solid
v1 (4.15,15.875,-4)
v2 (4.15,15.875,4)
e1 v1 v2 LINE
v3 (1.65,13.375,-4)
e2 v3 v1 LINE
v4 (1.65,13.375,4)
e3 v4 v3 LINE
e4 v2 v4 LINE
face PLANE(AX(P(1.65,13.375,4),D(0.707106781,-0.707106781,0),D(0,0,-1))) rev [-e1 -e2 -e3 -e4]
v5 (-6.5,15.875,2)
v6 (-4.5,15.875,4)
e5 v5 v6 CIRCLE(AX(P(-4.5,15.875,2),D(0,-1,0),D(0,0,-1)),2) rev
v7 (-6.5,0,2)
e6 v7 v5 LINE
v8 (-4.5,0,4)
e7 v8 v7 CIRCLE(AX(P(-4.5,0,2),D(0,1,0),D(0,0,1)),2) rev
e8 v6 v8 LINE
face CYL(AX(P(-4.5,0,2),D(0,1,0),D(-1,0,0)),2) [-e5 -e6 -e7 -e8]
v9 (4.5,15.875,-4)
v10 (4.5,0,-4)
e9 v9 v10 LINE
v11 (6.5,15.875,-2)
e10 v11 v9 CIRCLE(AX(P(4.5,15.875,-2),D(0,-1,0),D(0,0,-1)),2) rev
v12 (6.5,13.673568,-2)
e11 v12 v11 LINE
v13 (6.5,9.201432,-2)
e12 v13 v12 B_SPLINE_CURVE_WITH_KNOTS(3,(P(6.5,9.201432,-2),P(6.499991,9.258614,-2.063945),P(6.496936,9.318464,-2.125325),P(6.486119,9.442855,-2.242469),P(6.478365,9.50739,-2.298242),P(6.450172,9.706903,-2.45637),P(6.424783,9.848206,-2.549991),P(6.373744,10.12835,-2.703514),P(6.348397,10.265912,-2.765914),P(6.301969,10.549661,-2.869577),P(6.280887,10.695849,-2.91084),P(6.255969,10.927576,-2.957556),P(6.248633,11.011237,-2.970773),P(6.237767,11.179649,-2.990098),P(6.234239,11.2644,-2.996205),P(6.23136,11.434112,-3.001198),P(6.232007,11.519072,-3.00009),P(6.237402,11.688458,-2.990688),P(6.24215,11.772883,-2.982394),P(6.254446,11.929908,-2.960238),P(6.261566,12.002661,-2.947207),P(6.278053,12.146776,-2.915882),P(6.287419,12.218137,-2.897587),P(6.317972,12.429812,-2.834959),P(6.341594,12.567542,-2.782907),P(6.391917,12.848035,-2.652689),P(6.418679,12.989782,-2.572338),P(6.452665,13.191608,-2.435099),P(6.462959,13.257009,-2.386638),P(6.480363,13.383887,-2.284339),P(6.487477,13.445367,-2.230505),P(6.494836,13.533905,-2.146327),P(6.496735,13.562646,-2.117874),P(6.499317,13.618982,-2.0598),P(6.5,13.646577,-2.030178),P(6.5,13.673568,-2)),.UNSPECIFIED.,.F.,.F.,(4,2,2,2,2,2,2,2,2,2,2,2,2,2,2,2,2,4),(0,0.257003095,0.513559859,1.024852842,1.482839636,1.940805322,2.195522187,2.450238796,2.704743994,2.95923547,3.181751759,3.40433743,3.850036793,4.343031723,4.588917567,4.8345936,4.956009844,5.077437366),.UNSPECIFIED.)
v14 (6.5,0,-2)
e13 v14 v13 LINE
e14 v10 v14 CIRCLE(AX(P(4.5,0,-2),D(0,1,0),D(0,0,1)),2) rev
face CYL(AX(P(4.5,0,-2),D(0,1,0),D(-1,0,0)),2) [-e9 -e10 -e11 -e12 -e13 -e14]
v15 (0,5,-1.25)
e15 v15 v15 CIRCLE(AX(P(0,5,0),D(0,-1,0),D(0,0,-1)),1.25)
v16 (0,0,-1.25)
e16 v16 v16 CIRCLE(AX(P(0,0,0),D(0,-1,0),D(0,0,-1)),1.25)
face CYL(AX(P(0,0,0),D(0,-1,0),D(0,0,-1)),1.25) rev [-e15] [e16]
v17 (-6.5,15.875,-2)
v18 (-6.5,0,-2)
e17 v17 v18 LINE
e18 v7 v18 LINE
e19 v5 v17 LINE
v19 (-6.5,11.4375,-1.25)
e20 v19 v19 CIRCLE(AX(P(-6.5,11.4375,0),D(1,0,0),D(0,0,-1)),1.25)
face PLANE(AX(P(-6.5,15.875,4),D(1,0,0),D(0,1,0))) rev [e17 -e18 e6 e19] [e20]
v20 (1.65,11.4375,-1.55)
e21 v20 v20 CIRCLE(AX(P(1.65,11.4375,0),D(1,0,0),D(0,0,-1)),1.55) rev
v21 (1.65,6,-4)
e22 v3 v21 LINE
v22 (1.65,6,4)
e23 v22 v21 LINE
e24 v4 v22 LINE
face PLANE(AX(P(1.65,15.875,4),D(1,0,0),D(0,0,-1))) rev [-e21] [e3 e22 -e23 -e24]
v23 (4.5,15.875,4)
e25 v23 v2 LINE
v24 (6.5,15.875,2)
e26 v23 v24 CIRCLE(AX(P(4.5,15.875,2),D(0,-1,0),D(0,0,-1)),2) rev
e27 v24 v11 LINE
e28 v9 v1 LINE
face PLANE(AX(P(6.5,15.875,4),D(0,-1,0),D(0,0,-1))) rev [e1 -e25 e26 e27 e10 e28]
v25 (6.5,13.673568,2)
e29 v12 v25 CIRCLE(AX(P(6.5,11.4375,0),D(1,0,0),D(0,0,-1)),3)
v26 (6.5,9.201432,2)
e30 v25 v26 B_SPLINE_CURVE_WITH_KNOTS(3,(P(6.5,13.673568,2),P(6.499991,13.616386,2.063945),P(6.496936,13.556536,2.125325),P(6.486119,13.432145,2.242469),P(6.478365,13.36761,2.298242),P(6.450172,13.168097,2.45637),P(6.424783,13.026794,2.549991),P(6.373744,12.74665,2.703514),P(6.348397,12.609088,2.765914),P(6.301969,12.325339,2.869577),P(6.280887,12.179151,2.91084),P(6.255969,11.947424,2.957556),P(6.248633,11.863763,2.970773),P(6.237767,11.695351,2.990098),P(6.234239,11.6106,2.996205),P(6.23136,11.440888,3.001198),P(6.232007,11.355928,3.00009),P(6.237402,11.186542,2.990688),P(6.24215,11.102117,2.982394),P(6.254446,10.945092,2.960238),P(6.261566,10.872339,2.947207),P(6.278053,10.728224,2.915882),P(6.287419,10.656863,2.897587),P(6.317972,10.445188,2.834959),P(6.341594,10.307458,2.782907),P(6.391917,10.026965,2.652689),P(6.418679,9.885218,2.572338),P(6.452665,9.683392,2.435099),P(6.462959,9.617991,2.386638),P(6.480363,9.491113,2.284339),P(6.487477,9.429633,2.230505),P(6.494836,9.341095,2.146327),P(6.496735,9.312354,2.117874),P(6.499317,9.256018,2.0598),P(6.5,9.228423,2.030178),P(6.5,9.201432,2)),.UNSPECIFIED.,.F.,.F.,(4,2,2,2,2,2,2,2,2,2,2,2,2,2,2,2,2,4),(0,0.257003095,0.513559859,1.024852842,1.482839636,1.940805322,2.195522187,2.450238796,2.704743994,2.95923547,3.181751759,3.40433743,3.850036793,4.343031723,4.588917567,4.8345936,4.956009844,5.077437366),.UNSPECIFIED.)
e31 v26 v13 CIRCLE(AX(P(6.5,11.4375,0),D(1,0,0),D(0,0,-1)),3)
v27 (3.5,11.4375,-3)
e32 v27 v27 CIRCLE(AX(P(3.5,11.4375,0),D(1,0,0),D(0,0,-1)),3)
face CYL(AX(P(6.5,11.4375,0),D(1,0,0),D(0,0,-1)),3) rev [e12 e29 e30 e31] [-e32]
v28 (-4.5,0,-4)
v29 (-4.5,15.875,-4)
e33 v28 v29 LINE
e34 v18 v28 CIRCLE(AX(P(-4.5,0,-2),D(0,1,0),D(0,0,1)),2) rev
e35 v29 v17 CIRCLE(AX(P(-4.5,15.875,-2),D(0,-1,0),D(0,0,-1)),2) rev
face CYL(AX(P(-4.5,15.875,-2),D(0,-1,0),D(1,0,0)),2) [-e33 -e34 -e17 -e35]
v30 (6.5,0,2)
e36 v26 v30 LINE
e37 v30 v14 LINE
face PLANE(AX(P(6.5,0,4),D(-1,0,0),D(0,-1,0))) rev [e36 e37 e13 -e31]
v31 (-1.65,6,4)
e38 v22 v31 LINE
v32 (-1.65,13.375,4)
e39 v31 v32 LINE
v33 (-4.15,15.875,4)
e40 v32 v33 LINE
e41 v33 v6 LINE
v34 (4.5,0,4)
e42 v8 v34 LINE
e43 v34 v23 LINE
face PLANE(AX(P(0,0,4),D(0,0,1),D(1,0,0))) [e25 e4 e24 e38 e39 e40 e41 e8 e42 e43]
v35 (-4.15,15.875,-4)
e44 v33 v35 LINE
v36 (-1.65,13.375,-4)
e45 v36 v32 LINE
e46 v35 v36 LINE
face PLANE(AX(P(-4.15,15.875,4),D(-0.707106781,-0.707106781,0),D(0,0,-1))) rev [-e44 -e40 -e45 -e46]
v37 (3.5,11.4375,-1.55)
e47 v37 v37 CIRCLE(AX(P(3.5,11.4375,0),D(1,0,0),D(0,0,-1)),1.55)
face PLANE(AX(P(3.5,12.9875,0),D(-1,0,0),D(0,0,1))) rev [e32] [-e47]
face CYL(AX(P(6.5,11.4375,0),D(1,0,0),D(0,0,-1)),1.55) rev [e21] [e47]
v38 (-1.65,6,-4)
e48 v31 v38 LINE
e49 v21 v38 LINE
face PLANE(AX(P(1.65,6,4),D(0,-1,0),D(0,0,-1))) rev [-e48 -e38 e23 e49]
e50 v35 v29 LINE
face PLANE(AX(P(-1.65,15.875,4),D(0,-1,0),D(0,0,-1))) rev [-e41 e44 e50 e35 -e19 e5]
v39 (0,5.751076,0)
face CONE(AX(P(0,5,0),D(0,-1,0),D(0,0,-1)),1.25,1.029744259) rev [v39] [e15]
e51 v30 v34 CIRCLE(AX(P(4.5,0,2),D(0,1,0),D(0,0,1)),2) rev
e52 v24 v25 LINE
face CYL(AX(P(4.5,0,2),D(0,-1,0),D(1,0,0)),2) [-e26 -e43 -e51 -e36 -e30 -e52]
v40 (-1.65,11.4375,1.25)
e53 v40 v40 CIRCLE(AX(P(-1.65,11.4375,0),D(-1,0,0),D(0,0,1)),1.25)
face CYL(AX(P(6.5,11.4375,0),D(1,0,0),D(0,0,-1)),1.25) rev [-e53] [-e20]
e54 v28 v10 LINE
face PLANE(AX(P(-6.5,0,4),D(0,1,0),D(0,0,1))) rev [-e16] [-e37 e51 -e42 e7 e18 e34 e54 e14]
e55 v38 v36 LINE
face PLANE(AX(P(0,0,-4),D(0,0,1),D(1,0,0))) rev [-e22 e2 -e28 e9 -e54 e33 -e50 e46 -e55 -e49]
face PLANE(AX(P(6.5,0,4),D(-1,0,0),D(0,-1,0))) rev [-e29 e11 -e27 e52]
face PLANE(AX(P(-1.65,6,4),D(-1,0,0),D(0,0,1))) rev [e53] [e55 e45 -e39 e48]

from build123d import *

# Parameters (mm, degrees)
BOSS_EXTRUDE1_DEPTH            = 4
M3X0_5_TAPPED_HOLE1_D          = 2.5
CBORE_FOR_M3_SHCS1_D           = 3.1
CBORE_FOR_M3_SHCS1_DEPTH       = 4.85
CBORE_FOR_M3_SHCS1_CBORE_D     = 6
CBORE_FOR_M3_SHCS1_CBORE_DEPTH = 3
CBORE_FOR_M3_SHCS1_TIP         = 0.931333959
M3_TAPPED_HOLE1_D              = 2.5
M3_TAPPED_HOLE1_DEPTH          = 5
M3_TAPPED_HOLE1_TIP            = 0.751075774
CHAMFER1_SIZE                  = 2.5
FILLET1_R                      = 2


with BuildPart() as part:
    # Sketch1 → Boss-Extrude1 (new, symmetric)
    with BuildSketch(Plane.XY):
        Polygon((-6.5, 0), (6.5, 0), (6.5, 15.875), (1.65, 15.875), (1.65, 6), (-1.65, 6), (-1.65, 15.875), (-6.5, 15.875), align=None)
    extrude(amount=BOSS_EXTRUDE1_DEPTH, both=True)

    # M3x0.5 Tapped Hole1 (through all)
    with Locations(Plane(origin=(6.5, 0, 0), x_dir=(0, 0, -1), z_dir=(1, 0, 0))):
        with Locations((0, 11.4375)):
            Hole(M3X0_5_TAPPED_HOLE1_D / 2)

    # CBORE for M3 SHCS1
    with Locations(Plane(origin=(6.5, 0, 0), x_dir=(0, 0, -1), z_dir=(1, 0, 0))):
        with Locations((0, 11.4375)):
            CounterBoreHole(CBORE_FOR_M3_SHCS1_D / 2, CBORE_FOR_M3_SHCS1_CBORE_D / 2, CBORE_FOR_M3_SHCS1_CBORE_DEPTH, depth=CBORE_FOR_M3_SHCS1_DEPTH)
            with Locations((0, 0, -(CBORE_FOR_M3_SHCS1_DEPTH + CBORE_FOR_M3_SHCS1_TIP / 2))):  # 118° drill point
                Cone(0, CBORE_FOR_M3_SHCS1_D / 2, CBORE_FOR_M3_SHCS1_TIP, mode=Mode.SUBTRACT)

    # M3 Tapped Hole1
    with Locations(Plane(origin=(0, 0, 0), x_dir=(-1, 0, 0), z_dir=(0, -1, 0))):
        with Locations((0, 0)):
            Hole(M3_TAPPED_HOLE1_D / 2, depth=M3_TAPPED_HOLE1_DEPTH)
            with Locations((0, 0, -(M3_TAPPED_HOLE1_DEPTH + M3_TAPPED_HOLE1_TIP / 2))):  # 118° drill point
                Cone(0, M3_TAPPED_HOLE1_D / 2, M3_TAPPED_HOLE1_TIP, mode=Mode.SUBTRACT)

    # Chamfer1
    chamfer1_edges = [part.edges().sort_by_distance(p)[0] for p in [
        (-1.65, 15.875, 0),
        (1.65, 15.875, 0),
    ]]
    chamfer(chamfer1_edges, length=CHAMFER1_SIZE)

    # Fillet1
    # the kernel refuses this fillet: 2 mm, written as the material it takes off along each edge
    with BuildSketch(Plane(origin=(6.5, -5, -4), x_dir=(-1, 0, 0), z_dir=(0, 1, 0)), Plane(origin=(-6.5, 20.875, 4), x_dir=(0, 0, -1), z_dir=(0, -1, 0)), Plane(origin=(6.5, -5, 4), x_dir=(0, 0, -1), z_dir=(0, 1, 0)), Plane(origin=(-6.5, 20.875, -4), x_dir=(1, 0, 0), z_dir=(0, -1, 0))) as fillet1_piece_1:
        with BuildLine():
            CenterArc((FILLET1_R, FILLET1_R), FILLET1_R, 180, 90)
            Line((0, FILLET1_R), (0, 0))
            Line((0, 0), (FILLET1_R, 0))
        make_face()
    extrude(amount=25.875, mode=Mode.SUBTRACT)


solid = part.part
